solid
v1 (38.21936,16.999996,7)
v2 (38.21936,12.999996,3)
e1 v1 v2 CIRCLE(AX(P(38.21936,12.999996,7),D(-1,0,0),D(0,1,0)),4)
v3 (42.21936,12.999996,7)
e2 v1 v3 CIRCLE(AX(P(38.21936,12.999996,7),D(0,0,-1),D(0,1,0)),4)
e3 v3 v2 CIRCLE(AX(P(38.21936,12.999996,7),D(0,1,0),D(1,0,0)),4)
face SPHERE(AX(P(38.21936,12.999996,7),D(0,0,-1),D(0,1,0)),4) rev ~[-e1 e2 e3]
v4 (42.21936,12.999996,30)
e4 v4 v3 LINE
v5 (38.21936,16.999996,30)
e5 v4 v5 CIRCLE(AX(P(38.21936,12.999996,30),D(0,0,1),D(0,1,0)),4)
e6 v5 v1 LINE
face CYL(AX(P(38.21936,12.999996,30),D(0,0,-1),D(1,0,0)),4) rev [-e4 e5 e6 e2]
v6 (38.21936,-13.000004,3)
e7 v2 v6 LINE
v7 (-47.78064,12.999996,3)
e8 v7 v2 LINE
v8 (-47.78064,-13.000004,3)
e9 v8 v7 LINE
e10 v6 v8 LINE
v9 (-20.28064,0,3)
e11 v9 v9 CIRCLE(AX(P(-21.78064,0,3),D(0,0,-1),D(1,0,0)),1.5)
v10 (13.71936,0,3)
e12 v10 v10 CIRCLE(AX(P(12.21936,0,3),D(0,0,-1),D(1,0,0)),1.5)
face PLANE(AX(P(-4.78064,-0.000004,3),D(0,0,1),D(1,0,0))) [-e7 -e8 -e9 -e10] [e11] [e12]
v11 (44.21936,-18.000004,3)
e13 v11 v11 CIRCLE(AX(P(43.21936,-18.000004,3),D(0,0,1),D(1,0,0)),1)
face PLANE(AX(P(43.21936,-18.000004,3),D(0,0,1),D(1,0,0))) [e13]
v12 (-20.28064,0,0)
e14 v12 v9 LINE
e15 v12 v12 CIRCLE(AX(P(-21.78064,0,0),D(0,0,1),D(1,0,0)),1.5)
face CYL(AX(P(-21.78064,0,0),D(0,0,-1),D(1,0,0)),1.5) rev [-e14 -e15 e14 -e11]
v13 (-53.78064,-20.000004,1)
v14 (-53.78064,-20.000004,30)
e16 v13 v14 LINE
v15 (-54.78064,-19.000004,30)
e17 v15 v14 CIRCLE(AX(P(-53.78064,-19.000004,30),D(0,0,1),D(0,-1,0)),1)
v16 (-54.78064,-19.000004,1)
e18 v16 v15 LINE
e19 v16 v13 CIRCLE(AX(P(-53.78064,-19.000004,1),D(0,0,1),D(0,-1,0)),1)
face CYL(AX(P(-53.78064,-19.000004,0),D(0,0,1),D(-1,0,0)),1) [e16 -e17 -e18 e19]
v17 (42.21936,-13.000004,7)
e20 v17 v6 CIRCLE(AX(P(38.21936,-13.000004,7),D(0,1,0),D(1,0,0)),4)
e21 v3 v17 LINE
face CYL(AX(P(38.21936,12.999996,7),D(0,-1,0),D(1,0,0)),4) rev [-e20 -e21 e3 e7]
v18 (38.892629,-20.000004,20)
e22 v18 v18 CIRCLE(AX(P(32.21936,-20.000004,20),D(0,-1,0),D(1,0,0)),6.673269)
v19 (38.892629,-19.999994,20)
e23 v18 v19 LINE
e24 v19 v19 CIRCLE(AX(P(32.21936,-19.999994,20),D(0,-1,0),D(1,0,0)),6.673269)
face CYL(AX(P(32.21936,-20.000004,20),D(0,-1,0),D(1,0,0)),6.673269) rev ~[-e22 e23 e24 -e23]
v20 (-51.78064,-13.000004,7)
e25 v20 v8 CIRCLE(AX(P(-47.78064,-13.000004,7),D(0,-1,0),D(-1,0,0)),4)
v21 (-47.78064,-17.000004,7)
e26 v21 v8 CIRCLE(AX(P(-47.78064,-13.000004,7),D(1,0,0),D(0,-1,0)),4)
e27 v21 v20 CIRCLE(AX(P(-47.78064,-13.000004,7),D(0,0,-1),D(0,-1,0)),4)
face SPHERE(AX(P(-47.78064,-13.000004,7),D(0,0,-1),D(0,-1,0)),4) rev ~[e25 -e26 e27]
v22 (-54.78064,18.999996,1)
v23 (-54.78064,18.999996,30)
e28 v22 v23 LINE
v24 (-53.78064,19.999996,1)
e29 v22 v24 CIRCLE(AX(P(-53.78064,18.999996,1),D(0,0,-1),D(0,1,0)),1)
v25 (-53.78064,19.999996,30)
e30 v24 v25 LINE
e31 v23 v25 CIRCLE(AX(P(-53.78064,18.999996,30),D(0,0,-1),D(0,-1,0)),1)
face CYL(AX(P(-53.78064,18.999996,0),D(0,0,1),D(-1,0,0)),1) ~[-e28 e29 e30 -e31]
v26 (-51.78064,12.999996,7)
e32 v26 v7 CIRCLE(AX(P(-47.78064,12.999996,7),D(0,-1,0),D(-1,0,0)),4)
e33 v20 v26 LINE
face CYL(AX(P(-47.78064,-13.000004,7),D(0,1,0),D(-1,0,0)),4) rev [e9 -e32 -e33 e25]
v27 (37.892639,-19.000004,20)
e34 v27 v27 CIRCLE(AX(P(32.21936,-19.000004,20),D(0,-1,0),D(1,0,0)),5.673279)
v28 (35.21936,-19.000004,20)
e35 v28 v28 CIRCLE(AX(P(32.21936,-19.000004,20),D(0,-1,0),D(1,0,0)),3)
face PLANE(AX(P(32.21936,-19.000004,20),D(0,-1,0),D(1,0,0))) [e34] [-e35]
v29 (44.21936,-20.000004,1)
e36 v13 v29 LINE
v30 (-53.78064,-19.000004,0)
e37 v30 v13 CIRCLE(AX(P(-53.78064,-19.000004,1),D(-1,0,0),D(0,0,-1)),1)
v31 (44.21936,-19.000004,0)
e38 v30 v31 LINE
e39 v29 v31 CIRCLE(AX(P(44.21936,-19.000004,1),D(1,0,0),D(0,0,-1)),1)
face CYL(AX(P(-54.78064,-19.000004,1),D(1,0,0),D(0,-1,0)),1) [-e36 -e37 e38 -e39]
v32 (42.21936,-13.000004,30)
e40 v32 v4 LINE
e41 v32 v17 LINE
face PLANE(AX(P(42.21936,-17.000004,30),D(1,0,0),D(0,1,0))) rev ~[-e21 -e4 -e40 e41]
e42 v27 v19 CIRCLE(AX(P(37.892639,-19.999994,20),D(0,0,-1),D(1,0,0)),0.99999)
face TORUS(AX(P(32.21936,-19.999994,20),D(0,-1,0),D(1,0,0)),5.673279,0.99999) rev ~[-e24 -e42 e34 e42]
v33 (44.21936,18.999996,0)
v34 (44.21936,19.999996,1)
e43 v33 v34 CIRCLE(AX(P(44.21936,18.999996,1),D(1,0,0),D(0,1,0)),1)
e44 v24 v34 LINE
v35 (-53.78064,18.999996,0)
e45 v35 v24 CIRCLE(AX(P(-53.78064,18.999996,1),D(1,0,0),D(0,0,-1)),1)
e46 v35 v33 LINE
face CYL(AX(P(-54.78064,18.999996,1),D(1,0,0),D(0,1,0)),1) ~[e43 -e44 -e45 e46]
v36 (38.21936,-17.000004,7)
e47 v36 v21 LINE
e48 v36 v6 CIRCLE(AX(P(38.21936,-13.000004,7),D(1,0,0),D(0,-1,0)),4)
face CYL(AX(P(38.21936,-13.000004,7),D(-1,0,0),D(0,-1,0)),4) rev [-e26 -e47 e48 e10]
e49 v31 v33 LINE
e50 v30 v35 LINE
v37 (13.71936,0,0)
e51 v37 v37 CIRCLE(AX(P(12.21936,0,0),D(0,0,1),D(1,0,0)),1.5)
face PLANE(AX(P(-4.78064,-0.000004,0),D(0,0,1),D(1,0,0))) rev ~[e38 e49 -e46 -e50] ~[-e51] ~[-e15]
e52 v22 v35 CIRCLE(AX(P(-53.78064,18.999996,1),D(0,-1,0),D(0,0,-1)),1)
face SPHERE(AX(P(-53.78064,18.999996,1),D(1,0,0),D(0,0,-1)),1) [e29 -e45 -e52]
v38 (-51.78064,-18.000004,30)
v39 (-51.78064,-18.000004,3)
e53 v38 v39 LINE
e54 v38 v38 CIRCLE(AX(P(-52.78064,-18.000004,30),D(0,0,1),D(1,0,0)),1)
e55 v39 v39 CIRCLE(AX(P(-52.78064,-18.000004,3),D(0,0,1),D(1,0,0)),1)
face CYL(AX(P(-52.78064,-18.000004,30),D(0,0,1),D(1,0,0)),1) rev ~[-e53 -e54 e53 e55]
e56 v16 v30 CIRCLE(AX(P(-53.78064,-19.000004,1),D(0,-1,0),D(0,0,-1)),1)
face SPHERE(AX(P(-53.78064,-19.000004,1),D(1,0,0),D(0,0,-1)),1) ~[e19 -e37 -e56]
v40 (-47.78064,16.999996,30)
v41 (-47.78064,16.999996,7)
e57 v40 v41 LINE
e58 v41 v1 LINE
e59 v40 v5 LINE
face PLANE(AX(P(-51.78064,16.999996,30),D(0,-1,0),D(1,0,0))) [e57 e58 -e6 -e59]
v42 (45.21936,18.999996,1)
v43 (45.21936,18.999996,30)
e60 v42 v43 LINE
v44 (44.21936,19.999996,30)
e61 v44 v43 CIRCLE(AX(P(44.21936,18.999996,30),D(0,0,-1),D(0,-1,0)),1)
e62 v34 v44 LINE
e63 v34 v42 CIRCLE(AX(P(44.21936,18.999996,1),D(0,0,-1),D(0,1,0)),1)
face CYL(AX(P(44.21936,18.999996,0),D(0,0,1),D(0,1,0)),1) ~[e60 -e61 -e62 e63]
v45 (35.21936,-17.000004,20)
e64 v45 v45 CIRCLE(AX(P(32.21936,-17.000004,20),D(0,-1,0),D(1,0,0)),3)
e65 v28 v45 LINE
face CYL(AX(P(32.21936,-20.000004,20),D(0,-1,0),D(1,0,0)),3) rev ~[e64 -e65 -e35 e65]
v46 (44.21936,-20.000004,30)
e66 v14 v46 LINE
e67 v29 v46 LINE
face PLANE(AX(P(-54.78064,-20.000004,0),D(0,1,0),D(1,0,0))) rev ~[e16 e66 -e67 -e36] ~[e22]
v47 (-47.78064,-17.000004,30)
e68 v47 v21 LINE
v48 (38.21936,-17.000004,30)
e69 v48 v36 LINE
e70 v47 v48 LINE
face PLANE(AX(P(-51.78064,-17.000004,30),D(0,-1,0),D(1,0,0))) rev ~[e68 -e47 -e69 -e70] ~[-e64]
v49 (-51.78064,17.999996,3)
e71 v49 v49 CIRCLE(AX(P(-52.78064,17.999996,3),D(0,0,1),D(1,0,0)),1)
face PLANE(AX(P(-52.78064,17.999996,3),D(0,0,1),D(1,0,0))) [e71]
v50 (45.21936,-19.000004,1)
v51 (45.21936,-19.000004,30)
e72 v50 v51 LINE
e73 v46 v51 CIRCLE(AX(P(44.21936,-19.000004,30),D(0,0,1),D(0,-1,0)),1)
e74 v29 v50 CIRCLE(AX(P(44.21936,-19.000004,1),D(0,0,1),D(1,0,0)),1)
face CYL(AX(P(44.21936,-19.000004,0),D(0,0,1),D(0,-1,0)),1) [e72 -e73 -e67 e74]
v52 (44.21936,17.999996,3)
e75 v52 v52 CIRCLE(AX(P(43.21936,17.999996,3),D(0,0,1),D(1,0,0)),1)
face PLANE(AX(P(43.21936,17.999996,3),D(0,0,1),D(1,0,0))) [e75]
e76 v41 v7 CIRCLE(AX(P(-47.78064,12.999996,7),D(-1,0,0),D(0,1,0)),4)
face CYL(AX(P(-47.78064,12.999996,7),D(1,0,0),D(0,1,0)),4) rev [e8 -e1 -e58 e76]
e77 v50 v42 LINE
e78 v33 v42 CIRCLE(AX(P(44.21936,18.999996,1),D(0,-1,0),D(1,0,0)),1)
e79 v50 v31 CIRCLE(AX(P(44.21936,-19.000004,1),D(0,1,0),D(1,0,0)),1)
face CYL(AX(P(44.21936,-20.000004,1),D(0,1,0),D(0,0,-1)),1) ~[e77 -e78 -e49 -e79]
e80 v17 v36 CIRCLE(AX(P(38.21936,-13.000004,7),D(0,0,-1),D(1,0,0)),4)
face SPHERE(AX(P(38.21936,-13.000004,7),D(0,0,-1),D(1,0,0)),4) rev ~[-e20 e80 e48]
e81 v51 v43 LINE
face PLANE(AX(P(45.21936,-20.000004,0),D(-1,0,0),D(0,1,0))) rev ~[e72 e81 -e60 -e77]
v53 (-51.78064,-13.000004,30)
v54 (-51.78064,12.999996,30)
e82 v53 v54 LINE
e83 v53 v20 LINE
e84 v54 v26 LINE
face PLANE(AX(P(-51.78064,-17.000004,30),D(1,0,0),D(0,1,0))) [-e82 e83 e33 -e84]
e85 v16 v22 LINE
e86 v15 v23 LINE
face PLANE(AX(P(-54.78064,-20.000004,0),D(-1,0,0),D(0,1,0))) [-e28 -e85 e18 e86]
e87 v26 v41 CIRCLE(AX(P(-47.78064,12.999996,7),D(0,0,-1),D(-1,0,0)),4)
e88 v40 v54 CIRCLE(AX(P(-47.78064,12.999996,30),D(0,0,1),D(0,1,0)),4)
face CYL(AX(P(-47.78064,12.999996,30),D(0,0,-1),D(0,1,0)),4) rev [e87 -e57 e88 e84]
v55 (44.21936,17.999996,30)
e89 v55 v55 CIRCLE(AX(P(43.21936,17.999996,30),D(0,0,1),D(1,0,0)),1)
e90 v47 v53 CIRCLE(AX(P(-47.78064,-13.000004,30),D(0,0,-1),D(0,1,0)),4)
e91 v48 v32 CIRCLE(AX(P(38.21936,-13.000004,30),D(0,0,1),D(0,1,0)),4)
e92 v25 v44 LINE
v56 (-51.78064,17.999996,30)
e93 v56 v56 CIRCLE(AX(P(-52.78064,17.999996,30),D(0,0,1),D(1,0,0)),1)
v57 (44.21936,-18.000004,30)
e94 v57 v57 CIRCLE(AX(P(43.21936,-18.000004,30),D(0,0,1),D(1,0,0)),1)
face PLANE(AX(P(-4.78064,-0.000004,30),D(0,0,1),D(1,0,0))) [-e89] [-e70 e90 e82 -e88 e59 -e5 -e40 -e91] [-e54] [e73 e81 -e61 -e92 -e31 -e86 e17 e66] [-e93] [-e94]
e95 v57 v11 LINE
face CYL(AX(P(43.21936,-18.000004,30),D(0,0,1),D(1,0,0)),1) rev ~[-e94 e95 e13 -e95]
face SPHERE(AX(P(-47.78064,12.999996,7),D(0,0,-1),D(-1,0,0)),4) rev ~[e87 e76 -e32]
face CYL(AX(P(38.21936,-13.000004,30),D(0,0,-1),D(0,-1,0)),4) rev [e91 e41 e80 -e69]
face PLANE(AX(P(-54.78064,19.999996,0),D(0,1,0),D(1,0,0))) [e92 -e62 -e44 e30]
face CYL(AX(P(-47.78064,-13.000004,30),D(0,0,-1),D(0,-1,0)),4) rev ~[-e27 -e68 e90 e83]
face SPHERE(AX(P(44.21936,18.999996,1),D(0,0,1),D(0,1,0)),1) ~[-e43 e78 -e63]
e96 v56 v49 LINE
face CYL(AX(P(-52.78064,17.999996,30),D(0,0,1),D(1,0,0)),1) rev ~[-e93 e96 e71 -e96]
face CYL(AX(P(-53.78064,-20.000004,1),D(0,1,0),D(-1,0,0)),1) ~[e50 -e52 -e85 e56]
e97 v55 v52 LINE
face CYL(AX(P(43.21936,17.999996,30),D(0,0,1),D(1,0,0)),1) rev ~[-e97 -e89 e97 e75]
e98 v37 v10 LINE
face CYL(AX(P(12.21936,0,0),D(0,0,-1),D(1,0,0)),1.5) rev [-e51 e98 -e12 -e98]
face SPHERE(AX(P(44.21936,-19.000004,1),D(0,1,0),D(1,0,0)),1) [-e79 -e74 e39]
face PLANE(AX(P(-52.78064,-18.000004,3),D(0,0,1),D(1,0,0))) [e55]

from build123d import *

# Parameters (mm, degrees)
F0_W      = 100
F0_H      = 40
F0_R      = 1.5
F1_DEPTH  = 30
F2_W      = 94
F2_H      = 34
F2_R      = 1
F3_DEPTH  = 27
F4_R      = 3
F5_DEPTH  = 5
F6_R      = 1
F7_R      = 4
F8_R      = 4
F9_R      = 6.6732690133
F10_DEPTH = 1
F11_R     = 0.99999


# Not quite as in the source:
# - a fillet or chamfer is up to 0.001 mm smaller than in the source, because OpenCascade refuses the exact size


with BuildPart() as f1:
    # F0 (on Top) → F1 (new body)
    with BuildSketch(Plane.XY):
        with Locations((-4.7806398869, -4.191e-06)):
            Rectangle(F0_W, F0_H)
        with Locations((-21.7806398869, 0)):
            Circle(F0_R, mode=Mode.SUBTRACT)
        with Locations((12.2193601131, 0)):
            Circle(F0_R, mode=Mode.SUBTRACT)
    extrude(amount=F1_DEPTH)

    # F2 (on face) → F3 (cut)
    with BuildSketch(Plane.XY.offset(30)):
        with Locations((-4.7806398869, -4.191e-06)):
            Rectangle(F2_W, F2_H)
        with Locations((-52.7806398869, 17.999995809)):
            Circle(F2_R)
        with Locations((-52.7806398869, -18.000004191)):
            Circle(F2_R)
        with Locations((43.2193601131, 17.999995809)):
            Circle(F2_R)
        with Locations((43.2193601131, -18.000004191)):
            Circle(F2_R)
    extrude(amount=-F3_DEPTH, mode=Mode.SUBTRACT)

    # F4 (on face) → F5 (cut)
    with BuildSketch(Plane.XZ.offset(20.000004191)):
        with Locations((32.2193601131, 20)):
            Circle(F4_R)
    extrude(amount=-F5_DEPTH, mode=Mode.SUBTRACT)

    # F6
    f6_edges = [f1.edges().sort_by_distance(p)[0] for p in [
        (45.21936, 19.999996, 15),
        (-4.78064, 19.999996, 0),
        (45.21936, -4e-06, 0),
        (45.21936, -20.000004, 15),
        (-4.78064, -20.000004, 0),
        (-54.78064, -4e-06, 0),
        (-54.78064, 19.999996, 15),
        (-54.78064, -20.000004, 15),
    ]]
    fillet(f6_edges, radius=F6_R)

    # F7
    f7_edges = [f1.edges().sort_by_distance(p)[0] for p in [
        (42.21936, 16.999996, 16.5),
        (-51.78064, 16.999996, 16.5),
        (-51.78064, -17.000004, 16.5),
        (42.21936, -17.000004, 16.5),
    ]]
    fillet(f7_edges, radius=F7_R)

    # F8
    f8_edges = [f1.edges().sort_by_distance(p)[0] for p in [
        (-4.78064, 16.999996, 3),
    ]]
    fillet(f8_edges, radius=F8_R)

    # F9 (on face) → F10 (cut)
    with BuildSketch(Plane.XZ.offset(20.000004191)):
        with Locations((32.2193601131, 20)):
            Circle(F9_R)
    extrude(amount=-F10_DEPTH, mode=Mode.SUBTRACT)

    # F11 (radius 1 in the source; OpenCascade refuses exactly that, so slightly less here)
    f11_edges = [f1.edges().sort_by_distance(p)[0] for p in [
        (25.546091, -19.000004, 20),
    ]]
    fillet(f11_edges, radius=F11_R)


solid = f1.part
